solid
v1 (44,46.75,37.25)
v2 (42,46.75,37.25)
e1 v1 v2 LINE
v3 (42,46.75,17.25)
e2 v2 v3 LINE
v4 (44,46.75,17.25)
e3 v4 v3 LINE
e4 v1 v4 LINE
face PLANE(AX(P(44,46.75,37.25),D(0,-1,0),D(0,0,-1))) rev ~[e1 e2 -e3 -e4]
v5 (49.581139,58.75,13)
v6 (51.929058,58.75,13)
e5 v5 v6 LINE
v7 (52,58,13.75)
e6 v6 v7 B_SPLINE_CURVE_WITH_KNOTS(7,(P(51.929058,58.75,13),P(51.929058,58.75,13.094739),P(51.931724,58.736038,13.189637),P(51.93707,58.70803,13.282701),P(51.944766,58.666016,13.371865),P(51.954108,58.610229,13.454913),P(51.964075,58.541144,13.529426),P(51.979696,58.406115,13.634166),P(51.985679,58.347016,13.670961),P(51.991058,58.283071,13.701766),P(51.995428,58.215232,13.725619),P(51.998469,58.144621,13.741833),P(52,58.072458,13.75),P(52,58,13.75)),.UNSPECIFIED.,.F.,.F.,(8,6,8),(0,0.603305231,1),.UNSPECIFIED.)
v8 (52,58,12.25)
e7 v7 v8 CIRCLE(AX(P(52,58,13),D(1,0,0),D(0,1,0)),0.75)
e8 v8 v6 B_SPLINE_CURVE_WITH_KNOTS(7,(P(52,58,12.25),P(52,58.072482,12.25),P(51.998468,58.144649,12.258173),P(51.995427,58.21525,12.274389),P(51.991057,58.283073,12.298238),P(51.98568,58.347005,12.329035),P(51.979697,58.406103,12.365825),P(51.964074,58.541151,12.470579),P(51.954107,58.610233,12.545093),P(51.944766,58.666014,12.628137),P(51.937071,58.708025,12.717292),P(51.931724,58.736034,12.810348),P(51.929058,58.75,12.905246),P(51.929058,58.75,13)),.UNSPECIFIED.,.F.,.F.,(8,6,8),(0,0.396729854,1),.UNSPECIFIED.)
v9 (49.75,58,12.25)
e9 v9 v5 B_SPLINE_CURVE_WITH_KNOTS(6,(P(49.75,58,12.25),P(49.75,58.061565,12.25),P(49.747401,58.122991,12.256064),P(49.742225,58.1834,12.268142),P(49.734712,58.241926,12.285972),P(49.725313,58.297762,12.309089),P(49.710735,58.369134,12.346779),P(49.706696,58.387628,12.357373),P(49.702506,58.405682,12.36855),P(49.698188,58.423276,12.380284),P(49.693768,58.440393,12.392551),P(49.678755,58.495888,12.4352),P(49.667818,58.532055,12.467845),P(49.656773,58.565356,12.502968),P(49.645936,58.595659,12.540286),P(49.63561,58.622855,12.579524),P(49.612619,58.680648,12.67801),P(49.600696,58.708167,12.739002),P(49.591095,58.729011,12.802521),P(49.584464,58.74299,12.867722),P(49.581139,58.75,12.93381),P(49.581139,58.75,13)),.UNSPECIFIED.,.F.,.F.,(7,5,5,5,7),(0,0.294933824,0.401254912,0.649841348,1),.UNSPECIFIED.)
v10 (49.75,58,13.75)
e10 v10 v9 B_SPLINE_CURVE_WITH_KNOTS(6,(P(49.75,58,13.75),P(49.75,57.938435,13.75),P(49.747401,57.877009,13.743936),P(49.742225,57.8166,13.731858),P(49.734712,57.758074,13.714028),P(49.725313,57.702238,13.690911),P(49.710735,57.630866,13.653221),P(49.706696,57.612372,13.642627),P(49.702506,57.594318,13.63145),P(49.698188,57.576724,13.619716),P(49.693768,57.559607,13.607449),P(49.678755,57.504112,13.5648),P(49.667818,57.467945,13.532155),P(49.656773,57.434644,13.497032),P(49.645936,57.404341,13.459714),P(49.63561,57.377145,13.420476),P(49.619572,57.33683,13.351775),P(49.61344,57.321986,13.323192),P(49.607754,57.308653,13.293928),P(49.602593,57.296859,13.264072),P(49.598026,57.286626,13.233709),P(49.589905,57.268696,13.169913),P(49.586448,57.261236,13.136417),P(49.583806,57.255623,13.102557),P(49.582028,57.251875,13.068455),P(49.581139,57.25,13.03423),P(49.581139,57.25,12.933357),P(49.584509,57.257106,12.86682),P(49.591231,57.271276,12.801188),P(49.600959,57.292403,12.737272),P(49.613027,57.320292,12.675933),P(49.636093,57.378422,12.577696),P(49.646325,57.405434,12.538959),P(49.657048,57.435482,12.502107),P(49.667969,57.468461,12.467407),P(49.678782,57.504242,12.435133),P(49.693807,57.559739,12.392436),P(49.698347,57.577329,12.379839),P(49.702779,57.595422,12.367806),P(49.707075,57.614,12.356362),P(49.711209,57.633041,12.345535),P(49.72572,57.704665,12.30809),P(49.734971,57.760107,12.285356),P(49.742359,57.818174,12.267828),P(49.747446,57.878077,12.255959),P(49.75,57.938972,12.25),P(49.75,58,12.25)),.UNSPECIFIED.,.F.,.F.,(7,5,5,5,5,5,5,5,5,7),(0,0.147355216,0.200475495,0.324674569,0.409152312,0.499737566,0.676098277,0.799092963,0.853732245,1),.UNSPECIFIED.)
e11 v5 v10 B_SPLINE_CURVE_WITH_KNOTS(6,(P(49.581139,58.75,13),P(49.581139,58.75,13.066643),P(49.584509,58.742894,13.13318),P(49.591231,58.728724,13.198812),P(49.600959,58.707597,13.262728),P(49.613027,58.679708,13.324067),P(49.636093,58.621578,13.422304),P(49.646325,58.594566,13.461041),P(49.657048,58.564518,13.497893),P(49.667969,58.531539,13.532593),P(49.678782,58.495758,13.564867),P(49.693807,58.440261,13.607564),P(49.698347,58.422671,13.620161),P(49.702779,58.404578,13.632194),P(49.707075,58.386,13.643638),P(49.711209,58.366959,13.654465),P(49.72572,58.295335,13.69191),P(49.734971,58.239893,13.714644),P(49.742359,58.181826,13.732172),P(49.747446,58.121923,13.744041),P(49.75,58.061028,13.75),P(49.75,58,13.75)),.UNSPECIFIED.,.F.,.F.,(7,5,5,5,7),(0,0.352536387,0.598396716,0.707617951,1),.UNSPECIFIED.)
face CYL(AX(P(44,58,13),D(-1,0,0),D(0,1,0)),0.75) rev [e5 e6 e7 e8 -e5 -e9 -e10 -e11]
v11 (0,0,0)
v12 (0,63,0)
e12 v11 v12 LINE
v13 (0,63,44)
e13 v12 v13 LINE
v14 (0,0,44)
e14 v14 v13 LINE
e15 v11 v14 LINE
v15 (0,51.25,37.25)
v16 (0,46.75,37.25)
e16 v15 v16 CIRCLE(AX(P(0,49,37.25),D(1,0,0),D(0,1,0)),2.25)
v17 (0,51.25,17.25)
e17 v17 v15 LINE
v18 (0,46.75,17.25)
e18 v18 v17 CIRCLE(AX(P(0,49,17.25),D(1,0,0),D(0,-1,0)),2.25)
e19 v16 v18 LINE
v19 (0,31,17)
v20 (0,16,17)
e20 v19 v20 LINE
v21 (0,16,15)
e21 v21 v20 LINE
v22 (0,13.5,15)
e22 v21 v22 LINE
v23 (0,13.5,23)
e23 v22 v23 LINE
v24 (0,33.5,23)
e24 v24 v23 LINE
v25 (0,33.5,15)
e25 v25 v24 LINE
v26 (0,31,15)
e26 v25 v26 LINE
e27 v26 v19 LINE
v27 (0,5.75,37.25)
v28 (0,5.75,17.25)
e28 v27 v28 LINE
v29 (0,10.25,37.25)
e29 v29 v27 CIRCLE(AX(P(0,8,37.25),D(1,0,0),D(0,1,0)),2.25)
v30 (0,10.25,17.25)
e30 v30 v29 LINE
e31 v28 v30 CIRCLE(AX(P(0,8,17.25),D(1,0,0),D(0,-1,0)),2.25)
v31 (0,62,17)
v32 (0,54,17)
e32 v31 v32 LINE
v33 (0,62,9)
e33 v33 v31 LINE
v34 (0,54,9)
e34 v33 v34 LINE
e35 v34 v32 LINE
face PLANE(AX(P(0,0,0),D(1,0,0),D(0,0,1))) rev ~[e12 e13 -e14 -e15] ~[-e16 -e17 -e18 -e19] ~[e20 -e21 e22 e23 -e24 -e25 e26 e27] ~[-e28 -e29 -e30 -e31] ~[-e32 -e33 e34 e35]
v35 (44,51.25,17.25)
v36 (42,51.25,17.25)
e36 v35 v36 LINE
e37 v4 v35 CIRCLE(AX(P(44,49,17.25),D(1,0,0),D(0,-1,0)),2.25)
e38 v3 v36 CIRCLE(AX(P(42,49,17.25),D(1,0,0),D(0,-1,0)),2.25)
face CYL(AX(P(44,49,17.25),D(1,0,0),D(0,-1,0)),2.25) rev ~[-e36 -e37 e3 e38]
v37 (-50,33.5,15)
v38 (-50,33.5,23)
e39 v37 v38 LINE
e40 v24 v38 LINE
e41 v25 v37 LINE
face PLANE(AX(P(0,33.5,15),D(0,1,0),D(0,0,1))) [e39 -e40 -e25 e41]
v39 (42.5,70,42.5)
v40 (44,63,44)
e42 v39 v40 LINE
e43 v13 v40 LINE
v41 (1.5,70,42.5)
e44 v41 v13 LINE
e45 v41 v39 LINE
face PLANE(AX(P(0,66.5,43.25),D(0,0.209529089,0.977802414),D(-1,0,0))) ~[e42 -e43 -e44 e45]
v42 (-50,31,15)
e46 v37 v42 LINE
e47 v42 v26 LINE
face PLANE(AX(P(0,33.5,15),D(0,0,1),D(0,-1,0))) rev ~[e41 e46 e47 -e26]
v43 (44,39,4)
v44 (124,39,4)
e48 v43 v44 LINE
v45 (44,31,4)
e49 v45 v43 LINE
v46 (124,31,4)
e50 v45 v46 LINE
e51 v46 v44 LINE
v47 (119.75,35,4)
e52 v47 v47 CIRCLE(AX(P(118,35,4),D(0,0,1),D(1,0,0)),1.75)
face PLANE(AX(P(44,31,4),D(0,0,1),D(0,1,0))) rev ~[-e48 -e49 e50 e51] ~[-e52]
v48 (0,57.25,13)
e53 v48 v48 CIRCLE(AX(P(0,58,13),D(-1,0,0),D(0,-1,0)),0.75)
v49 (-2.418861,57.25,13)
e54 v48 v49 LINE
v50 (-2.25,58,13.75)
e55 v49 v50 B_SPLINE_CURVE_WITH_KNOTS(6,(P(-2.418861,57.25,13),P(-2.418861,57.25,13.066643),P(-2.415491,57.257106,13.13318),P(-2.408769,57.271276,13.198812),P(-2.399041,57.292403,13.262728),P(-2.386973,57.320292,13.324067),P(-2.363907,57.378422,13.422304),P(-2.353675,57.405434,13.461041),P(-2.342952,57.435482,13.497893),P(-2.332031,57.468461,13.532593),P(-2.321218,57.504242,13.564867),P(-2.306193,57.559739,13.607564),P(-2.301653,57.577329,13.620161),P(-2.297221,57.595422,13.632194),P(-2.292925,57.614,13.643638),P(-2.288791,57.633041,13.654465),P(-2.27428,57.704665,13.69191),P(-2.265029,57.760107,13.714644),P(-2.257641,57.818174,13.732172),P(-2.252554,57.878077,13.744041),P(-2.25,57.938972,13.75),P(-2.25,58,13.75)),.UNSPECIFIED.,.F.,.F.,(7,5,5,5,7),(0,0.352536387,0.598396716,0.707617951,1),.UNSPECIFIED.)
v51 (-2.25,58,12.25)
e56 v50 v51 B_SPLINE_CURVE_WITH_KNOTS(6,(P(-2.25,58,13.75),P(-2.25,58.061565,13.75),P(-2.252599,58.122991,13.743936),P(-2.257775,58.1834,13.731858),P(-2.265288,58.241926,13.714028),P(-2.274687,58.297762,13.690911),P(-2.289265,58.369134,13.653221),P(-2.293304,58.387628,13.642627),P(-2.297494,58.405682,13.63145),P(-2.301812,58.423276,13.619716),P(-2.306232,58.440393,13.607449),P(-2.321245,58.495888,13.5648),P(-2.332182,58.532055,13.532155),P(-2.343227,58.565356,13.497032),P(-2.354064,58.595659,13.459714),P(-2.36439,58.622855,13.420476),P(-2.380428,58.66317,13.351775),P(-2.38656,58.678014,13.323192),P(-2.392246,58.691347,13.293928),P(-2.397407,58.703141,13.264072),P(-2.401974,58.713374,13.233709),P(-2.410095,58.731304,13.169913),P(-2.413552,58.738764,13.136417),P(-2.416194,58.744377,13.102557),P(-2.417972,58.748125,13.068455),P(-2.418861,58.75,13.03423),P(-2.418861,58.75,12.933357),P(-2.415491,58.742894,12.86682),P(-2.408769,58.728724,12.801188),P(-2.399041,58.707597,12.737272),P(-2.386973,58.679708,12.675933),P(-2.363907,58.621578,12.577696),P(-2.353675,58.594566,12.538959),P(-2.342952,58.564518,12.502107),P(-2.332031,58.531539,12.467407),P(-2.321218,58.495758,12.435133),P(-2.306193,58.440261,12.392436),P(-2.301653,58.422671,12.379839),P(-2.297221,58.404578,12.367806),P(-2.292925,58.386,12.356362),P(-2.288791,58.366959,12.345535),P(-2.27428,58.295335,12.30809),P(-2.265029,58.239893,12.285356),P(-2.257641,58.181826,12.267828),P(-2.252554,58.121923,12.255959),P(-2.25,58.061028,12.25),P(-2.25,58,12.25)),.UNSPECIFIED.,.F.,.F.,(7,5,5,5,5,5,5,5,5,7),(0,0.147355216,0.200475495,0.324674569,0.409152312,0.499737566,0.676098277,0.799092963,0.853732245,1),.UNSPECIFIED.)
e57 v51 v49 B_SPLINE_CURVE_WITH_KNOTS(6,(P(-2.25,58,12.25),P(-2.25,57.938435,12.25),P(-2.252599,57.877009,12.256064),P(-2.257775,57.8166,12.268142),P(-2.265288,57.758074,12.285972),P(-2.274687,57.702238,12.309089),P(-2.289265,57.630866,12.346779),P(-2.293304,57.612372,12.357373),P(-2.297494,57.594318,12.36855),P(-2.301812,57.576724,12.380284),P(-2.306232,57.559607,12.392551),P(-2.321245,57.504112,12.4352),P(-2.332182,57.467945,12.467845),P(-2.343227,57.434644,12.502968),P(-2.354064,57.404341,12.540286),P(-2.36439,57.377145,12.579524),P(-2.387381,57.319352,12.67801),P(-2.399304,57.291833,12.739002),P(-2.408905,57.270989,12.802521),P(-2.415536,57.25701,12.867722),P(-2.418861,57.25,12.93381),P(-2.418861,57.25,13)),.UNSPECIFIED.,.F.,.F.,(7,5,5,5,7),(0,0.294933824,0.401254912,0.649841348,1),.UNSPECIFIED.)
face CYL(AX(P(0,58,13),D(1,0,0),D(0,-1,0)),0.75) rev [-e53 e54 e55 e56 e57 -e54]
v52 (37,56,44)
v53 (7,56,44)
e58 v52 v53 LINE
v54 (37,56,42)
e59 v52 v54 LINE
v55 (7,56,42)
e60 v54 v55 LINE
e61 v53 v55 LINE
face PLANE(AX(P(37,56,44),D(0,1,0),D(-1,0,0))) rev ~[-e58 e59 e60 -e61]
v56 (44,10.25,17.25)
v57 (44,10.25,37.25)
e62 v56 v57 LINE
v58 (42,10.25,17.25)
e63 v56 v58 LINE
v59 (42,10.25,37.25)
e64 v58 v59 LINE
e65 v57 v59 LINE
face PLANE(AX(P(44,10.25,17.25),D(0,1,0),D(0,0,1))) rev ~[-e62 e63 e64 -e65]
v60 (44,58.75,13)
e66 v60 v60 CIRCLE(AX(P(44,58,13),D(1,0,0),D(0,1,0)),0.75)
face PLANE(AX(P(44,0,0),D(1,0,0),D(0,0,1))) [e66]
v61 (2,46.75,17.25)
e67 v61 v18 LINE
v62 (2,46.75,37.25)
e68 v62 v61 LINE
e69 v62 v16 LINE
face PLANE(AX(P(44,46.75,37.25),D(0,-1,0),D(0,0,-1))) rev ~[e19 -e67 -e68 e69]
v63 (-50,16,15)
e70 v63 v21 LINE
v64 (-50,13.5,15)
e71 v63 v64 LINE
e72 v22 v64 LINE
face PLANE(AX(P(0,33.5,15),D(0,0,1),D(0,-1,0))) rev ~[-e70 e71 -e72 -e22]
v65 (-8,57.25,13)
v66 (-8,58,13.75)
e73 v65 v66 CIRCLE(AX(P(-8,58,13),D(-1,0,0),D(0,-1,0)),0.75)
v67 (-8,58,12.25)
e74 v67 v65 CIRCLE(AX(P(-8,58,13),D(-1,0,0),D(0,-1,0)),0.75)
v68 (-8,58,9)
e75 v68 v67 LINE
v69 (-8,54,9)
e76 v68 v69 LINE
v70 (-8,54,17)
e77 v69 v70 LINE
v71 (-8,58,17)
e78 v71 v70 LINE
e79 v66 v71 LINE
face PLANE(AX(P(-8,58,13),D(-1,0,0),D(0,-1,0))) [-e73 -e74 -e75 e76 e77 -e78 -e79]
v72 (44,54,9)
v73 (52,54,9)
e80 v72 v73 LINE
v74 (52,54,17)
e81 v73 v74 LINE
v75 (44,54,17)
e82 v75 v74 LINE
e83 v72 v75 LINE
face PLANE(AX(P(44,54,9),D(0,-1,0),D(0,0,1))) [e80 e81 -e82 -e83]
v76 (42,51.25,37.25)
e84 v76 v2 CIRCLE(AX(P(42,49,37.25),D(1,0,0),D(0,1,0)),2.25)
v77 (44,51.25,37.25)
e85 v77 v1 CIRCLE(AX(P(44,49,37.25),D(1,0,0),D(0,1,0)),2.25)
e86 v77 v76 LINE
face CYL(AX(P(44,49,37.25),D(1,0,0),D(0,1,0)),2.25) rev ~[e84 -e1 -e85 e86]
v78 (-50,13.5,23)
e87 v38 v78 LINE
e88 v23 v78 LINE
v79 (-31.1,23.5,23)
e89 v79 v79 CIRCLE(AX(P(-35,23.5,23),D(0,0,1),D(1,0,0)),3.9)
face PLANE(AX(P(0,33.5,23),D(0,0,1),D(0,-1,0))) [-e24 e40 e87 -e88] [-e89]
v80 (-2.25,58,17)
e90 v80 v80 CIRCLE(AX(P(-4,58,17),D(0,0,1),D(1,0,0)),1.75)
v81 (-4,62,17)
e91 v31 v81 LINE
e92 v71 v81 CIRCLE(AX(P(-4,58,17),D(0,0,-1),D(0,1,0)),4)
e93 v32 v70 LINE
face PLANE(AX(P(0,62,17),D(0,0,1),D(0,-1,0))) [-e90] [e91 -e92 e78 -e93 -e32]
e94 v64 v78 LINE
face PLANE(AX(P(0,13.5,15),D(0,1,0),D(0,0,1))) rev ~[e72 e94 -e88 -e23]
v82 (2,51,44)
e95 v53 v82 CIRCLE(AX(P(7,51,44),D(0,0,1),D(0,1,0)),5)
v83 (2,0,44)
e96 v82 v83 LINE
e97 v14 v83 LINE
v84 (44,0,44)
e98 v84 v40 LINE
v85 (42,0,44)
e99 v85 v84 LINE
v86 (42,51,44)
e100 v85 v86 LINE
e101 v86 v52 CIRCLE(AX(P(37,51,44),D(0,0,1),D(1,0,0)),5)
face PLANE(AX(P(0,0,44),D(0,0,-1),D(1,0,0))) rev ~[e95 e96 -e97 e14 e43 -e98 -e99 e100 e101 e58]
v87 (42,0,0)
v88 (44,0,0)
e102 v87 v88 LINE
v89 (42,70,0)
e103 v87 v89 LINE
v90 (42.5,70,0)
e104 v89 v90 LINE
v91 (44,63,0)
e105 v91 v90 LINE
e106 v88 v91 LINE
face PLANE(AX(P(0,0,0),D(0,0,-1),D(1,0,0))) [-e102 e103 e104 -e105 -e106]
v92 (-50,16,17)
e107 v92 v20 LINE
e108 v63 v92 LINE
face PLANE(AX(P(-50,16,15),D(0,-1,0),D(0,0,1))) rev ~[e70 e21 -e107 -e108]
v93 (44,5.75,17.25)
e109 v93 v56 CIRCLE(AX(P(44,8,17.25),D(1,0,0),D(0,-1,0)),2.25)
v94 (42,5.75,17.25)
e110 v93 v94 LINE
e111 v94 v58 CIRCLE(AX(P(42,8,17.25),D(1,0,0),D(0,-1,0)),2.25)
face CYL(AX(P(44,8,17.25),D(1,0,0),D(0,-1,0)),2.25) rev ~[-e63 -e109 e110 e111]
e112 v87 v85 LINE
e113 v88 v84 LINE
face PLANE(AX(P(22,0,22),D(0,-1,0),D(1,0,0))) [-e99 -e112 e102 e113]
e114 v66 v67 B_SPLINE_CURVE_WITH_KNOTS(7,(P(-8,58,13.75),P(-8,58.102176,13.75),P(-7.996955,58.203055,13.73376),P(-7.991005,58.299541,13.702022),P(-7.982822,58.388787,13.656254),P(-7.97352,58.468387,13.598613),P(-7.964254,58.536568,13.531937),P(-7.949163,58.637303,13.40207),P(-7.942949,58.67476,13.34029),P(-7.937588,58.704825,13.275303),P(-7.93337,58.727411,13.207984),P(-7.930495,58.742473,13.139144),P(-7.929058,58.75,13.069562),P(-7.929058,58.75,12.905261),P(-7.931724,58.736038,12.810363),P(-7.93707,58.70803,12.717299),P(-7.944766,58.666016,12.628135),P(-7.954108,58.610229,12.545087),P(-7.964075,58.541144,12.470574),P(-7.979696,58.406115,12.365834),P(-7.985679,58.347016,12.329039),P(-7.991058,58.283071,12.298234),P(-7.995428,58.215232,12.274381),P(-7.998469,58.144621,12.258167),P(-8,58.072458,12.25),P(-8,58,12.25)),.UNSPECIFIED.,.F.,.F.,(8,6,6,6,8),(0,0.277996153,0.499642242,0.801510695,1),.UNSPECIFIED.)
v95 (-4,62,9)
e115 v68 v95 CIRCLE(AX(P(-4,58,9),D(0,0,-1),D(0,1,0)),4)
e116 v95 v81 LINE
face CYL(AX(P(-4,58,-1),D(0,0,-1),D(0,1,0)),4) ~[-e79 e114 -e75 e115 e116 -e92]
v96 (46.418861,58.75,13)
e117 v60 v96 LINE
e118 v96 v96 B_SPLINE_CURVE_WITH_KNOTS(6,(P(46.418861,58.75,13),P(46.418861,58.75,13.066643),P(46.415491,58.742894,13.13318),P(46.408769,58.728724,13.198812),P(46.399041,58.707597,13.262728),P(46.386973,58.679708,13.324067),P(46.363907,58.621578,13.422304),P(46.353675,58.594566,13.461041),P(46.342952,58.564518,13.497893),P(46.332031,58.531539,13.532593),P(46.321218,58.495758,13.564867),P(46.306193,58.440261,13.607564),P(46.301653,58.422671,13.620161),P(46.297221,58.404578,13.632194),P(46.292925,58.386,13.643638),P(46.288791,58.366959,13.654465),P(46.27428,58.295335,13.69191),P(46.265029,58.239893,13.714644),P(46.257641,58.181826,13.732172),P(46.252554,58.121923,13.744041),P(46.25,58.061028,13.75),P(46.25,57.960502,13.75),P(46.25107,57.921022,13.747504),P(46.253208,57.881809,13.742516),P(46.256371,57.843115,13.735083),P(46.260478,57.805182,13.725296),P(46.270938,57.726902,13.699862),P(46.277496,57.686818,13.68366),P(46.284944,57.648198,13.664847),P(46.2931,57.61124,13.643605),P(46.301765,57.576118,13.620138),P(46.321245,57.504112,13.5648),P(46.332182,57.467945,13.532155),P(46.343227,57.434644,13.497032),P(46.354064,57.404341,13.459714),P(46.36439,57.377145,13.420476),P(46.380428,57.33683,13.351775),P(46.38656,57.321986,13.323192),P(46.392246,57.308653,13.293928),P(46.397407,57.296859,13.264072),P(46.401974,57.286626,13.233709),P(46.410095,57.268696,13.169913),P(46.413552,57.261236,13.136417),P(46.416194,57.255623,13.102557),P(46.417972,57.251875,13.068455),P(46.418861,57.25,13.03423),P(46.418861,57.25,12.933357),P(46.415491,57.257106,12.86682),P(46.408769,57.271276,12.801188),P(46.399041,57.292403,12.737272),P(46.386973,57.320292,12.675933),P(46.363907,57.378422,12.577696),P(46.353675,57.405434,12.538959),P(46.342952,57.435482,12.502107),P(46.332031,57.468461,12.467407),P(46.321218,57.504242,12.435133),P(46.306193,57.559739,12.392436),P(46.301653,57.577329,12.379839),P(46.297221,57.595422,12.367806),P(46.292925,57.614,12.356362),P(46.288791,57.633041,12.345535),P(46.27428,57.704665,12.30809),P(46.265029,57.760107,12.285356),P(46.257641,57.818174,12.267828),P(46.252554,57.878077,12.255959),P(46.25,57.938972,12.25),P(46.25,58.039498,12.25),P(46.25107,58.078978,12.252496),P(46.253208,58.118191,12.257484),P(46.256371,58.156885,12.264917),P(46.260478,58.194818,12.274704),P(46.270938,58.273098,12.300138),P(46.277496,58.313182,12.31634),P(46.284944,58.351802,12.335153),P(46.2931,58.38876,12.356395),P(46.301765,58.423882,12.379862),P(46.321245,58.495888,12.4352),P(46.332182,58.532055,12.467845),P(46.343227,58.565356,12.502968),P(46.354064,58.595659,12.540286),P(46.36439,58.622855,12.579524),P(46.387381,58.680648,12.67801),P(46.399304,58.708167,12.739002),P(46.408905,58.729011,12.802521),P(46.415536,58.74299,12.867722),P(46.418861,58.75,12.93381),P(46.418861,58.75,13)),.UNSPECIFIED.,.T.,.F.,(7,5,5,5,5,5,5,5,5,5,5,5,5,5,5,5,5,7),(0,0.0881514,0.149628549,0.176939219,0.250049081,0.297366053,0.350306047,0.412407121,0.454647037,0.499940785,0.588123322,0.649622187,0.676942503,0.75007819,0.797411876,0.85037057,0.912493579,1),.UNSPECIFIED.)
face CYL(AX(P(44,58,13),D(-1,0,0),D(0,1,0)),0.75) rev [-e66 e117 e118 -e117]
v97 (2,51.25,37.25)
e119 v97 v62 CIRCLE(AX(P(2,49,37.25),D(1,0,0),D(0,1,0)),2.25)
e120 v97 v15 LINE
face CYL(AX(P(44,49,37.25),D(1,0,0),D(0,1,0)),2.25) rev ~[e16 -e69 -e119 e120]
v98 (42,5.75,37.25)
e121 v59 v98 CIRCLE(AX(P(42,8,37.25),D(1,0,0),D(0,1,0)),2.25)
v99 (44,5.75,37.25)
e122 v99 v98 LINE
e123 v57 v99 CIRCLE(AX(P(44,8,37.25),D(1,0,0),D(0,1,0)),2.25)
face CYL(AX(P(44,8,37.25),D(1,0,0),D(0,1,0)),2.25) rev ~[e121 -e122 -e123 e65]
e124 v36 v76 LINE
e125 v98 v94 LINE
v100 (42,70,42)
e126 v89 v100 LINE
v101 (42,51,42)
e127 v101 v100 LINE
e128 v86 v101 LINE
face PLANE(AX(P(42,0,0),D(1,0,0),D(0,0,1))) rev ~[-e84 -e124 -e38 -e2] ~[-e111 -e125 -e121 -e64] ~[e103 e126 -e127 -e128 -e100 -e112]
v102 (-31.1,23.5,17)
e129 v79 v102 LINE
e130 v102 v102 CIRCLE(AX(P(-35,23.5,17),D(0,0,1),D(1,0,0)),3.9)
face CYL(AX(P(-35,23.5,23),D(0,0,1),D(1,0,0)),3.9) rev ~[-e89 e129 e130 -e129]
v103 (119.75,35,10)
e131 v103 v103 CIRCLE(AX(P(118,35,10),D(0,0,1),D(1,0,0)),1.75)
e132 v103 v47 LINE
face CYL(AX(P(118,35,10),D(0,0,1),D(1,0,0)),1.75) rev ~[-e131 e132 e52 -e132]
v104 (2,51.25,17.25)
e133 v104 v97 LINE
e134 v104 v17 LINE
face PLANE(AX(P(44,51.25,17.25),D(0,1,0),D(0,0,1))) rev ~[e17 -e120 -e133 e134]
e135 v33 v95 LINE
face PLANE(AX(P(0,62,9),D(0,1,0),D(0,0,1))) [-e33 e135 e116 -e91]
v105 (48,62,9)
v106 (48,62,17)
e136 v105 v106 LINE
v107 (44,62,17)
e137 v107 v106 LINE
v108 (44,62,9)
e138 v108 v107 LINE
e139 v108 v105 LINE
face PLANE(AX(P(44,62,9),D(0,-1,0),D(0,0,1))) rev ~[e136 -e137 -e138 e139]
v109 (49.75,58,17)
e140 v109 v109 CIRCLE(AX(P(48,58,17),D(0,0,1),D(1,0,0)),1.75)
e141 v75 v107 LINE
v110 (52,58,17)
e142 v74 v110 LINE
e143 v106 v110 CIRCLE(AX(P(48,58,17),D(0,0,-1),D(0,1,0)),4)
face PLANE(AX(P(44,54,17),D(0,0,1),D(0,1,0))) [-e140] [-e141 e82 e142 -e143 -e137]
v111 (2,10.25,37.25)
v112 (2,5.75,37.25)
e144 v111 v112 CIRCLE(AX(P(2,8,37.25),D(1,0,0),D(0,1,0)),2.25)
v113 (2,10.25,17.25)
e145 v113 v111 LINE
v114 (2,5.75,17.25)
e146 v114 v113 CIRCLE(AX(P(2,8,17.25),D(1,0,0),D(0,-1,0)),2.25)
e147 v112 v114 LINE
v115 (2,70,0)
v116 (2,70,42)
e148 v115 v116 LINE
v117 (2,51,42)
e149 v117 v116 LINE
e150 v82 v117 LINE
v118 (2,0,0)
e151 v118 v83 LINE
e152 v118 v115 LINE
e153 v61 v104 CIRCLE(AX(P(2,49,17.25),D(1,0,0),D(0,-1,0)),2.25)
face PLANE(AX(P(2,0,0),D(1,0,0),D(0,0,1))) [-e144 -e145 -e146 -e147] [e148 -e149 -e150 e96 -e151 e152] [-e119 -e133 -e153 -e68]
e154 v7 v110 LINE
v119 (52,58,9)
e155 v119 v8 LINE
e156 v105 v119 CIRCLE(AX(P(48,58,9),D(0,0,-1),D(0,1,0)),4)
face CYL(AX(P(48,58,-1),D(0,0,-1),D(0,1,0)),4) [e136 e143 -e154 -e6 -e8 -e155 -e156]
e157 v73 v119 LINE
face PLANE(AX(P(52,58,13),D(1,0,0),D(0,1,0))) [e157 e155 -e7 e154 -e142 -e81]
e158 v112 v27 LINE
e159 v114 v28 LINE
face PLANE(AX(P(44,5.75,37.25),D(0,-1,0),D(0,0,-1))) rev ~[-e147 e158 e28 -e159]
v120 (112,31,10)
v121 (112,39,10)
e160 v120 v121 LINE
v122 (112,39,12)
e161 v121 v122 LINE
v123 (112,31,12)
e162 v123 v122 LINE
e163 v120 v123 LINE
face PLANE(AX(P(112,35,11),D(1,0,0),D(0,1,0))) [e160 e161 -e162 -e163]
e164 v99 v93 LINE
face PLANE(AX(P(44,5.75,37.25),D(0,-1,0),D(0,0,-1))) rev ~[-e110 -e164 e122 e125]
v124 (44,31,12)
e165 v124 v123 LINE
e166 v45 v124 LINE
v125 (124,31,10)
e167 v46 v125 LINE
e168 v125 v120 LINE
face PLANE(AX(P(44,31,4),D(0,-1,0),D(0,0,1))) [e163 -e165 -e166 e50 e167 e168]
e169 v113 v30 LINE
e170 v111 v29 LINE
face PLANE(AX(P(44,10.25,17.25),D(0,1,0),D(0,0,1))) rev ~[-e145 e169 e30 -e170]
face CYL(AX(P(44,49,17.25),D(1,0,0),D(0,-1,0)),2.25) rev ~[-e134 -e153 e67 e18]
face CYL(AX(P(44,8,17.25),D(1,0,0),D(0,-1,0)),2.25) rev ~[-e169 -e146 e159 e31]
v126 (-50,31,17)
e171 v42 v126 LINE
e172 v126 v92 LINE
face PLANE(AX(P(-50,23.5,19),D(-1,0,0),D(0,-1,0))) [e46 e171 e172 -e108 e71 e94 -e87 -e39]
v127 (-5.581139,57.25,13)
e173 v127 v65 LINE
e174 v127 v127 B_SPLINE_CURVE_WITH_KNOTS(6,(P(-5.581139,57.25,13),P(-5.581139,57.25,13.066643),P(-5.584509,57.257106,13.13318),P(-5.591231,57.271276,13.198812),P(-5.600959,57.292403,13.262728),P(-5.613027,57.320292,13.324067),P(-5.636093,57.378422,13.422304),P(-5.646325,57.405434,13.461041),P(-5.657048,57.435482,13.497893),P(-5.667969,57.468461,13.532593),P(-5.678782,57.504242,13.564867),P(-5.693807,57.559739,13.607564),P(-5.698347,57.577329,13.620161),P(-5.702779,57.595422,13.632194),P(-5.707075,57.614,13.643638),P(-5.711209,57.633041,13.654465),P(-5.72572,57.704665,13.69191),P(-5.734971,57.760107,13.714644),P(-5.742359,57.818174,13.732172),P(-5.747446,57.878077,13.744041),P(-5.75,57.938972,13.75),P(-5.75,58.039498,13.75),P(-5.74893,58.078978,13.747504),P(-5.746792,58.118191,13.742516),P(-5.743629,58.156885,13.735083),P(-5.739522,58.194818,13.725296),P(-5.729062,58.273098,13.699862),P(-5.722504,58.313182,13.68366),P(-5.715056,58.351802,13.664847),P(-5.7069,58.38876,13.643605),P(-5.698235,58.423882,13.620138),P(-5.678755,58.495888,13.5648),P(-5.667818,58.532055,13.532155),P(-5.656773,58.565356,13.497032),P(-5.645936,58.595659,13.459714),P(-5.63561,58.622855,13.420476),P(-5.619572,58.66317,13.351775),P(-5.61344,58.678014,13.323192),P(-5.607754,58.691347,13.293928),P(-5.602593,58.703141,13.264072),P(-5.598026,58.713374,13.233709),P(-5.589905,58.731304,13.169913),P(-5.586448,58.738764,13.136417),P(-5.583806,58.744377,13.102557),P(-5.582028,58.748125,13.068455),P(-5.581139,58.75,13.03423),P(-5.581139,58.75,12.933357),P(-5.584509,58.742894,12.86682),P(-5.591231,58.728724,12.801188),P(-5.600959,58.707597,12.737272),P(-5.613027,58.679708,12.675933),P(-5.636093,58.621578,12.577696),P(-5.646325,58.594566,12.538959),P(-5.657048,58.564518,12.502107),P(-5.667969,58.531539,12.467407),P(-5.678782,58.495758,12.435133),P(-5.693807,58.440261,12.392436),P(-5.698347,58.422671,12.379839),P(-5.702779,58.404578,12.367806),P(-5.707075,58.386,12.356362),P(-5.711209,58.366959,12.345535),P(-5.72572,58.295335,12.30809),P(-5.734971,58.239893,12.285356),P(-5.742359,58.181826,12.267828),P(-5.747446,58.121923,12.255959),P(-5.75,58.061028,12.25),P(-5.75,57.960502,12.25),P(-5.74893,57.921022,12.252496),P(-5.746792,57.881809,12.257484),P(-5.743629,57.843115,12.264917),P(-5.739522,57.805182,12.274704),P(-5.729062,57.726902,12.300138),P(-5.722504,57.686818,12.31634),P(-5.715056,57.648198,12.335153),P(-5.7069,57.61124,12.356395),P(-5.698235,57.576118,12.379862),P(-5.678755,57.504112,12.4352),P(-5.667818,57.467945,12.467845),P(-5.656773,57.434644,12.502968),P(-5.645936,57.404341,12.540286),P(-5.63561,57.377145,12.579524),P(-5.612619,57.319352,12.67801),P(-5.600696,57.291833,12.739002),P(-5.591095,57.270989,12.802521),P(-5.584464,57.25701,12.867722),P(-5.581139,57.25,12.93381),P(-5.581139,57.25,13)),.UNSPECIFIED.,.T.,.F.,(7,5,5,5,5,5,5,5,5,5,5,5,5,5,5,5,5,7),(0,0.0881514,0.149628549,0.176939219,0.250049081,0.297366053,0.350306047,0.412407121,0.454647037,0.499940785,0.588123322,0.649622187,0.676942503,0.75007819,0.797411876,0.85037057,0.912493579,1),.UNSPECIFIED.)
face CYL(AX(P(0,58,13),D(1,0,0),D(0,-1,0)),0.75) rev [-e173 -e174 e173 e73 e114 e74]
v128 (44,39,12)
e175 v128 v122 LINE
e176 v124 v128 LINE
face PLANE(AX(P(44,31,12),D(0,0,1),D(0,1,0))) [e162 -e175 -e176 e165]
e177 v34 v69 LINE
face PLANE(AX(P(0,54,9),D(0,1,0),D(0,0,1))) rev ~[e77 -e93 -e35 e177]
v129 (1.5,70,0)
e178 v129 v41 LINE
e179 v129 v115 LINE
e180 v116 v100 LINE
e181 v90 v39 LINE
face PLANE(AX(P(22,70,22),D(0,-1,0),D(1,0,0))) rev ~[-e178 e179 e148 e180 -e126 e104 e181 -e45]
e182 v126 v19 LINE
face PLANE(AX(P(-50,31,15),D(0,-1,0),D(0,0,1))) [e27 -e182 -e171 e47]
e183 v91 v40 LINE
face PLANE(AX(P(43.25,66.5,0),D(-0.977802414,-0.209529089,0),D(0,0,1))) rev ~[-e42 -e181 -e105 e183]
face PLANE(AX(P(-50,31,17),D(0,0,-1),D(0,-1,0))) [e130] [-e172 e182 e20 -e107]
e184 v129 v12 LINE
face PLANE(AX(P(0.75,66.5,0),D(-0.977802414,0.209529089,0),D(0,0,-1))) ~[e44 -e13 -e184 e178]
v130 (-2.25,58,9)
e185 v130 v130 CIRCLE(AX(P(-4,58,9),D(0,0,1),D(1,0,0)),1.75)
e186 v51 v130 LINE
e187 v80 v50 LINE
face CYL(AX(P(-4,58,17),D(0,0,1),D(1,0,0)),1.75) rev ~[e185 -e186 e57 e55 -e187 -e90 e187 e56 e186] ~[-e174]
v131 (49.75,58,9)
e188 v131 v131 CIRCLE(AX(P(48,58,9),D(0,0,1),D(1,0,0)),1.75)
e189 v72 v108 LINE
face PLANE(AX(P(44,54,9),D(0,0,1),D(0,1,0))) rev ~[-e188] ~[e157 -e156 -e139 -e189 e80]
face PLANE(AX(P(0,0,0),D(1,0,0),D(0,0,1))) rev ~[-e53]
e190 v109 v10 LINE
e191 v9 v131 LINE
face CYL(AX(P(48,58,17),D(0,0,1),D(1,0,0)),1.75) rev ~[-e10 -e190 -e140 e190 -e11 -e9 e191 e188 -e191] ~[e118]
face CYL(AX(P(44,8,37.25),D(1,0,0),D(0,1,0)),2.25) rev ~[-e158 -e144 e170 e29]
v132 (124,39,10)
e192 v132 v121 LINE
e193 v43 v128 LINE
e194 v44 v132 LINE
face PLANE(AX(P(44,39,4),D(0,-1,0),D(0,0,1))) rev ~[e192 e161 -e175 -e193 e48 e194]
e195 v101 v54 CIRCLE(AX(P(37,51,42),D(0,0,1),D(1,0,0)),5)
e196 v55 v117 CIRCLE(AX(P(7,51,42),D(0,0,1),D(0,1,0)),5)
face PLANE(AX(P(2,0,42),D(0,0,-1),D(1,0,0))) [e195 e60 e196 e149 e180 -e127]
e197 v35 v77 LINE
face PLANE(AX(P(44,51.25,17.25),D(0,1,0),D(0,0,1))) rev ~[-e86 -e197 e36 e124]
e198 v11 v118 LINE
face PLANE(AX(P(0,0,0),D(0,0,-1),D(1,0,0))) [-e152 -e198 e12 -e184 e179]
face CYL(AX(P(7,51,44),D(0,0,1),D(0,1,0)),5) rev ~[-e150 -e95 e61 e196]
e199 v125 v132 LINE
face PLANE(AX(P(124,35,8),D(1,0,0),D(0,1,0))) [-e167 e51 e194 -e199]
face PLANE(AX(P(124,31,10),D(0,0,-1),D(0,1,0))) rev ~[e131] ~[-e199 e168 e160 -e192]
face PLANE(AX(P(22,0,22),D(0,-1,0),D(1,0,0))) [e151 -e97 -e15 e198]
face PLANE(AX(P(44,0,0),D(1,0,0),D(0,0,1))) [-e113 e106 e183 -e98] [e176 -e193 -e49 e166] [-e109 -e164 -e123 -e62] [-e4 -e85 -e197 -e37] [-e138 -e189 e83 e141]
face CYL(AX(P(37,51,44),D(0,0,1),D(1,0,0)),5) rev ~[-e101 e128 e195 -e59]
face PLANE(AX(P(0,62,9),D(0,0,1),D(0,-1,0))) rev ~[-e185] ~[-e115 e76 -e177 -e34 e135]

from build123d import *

# Parameters (mm, degrees)
F0_W         = 44
F0_H         = 44
F1_DEPTH     = 70
F2_W         = 40
F2_H         = 42
F3_DEPTH     = 70
F5_DEPTH     = 44
F7_DEPTH     = 2
F9_W         = 8
F9_H         = 8
F10_DEPTH    = 80
F11_W        = 8
F11_H        = 2
F12_DEPTH    = 12
F13_W        = 20
F13_H        = 8
F14_DEPTH    = 50
F15_W        = 15
F15_H        = 2
F16_DEPTH    = 50
F17_R        = 3.9
F18_DEPTH    = 20
F19_SIZE2    = 1.5
F19_SIZE     = 7
F20_SIZE2    = 7
F20_SIZE     = 1.5
F21_SIZE2    = 7
F21_SIZE     = 1.5
F22_R        = 1.75
F23_DEPTH    = 8
F24_DEPTH    = 44
F25_W        = 8
F25_H        = 8
F25_R        = 0.75
F26_DEPTH    = 8
F27_R        = 1.75
F28_DEPTH    = 8
F29_T1_DEPTH = 28
F30_W        = 8
F30_H        = 8
F30_R        = 0.75
F31_DEPTH    = 8
F32_R        = 1.75
F33_DEPTH    = 8
F34_T1_DEPTH = 28


# Not quite as in the source:
# - a fillet or chamfer that OpenCascade refuses, or shapes differently, is made with other operations: its cross-section is extruded or revolved along the edge and cut away or added


with BuildPart() as f1:
    # F0 (on Front) → F1 (new body)
    with BuildSketch(Plane.XZ):
        with Locations((22, 22)):
            Rectangle(F0_W, F0_H)
    extrude(amount=-F1_DEPTH)

    # F2 (on face) → F3 (cut, through all)
    with BuildSketch(Plane.XZ):
        with Locations((22, 21)):
            Rectangle(F2_W, F2_H)
    extrude(amount=-F3_DEPTH, mode=Mode.SUBTRACT)

    # F4 (on face) → F5 (cut)
    with BuildSketch(Plane.YZ.offset(44)):
        with BuildLine():
            ThreePointArc((51.25, 37.25), (49, 39.5), (46.75, 37.25))
            Line((46.75, 37.25), (46.75, 17.25))
            ThreePointArc((46.75, 17.25), (49, 15), (51.25, 17.25))
            Line((51.25, 17.25), (51.25, 37.25))
        make_face()
    extrude(amount=-F5_DEPTH, mode=Mode.SUBTRACT)

    # F6 (on face) → F7 (cut, through all)
    with BuildSketch(Plane.XY.offset(44)):
        with BuildLine():
            Line((2, 51), (2, 0))
            Line((2, 0), (42, 0))
            Line((42, 0), (42, 51))
            ThreePointArc((42, 51), (40.5355339059, 54.5355339059), (37, 56))
            Line((37, 56), (7, 56))
            ThreePointArc((7, 56), (3.4644660941, 54.5355339059), (2, 51))
        make_face()
    extrude(amount=-F7_DEPTH, mode=Mode.SUBTRACT)

    # F9 (on face) → F10 (join)
    with BuildSketch(Plane.YZ.offset(44)):
        with Locations((35, 8)):
            Rectangle(F9_W, F9_H)
    extrude(amount=F10_DEPTH)

    # F11 (on face) → F12 (cut)
    with BuildSketch(Plane.YZ.offset(124)):
        with Locations((35, 11)):
            Rectangle(F11_W, F11_H)
    extrude(amount=-F12_DEPTH, mode=Mode.SUBTRACT)

    # F13 (on face) → F14 (join)
    with BuildSketch(Plane(origin=(0, 0, 0), x_dir=(0, -1, 0), z_dir=(-1, 0, 0))):
        with Locations((-23.5, 19)):
            Rectangle(F13_W, F13_H)
    extrude(amount=F14_DEPTH)

    # F15 (on face) → F16 (cut, through all)
    with BuildSketch(Plane(origin=(-50, 0, 0), x_dir=(0, -1, 0), z_dir=(-1, 0, 0))):
        with Locations((-23.5, 16)):
            Rectangle(F15_W, F15_H)
    extrude(amount=-F16_DEPTH, mode=Mode.SUBTRACT)

    # F17 (on face) → F18 (cut)
    with BuildSketch(Plane.XY.offset(23)):
        with Locations((-35, 23.5)):
            Circle(F17_R)
    extrude(amount=-F18_DEPTH, mode=Mode.SUBTRACT)

    # F19
    f19_edges = [f1.edges().sort_by_distance(p)[0] for p in [
        (44, 70, 22),
    ]]
    f19_side = f1.faces().sort_by_distance((44, 34.490511, 22.116835))[0]
    chamfer(f19_edges, length=F19_SIZE, length2=F19_SIZE2, reference=f19_side)

    # F20
    f20_edges = [f1.edges().sort_by_distance(p)[0] for p in [
        (21.25, 70, 44),
    ]]
    f20_side = f1.faces().sort_by_distance((21.25, 70, 43.388261))[0]
    chamfer(f20_edges, length=F20_SIZE, length2=F20_SIZE2, reference=f20_side)

    # F21
    f21_edges = [f1.edges().sort_by_distance(p)[0] for p in [
        (0, 70, 21.25),
    ]]
    f21_side = f1.faces().sort_by_distance((42.439896, 70, 21.25))[0]
    chamfer(f21_edges, length=F21_SIZE, length2=F21_SIZE2, reference=f21_side)

    # F22 (on face) → F23 (cut)
    with BuildSketch(Plane.XY.offset(10)):
        with Locations((118, 35)):
            Circle(F22_R)
    extrude(amount=-F23_DEPTH, mode=Mode.SUBTRACT)

    # F8 (on face) → F24 (cut)
    with BuildSketch(Plane.YZ.offset(44)):
        with BuildLine():
            ThreePointArc((10.25, 37.25), (8, 39.5), (5.75, 37.25))
            Line((5.75, 37.25), (5.75, 17.25))
            ThreePointArc((5.75, 17.25), (8, 15), (10.25, 17.25))
            Line((10.25, 17.25), (10.25, 37.25))
        make_face()
    extrude(amount=-F24_DEPTH, mode=Mode.SUBTRACT)

    # F25 (on face) → F26 (join)
    with BuildSketch(Plane.YZ.offset(44)):
        with Locations((58, 13)):
            Rectangle(F25_W, F25_H)
        with Locations((58, 13)):
            Circle(F25_R, mode=Mode.SUBTRACT)
    extrude(amount=F26_DEPTH)

    # F27 (on face) → F28 (cut)
    with BuildSketch(Plane.XY.offset(17)):
        with Locations((48, 58)):
            Circle(F27_R)
    extrude(amount=-F28_DEPTH, mode=Mode.SUBTRACT)

    # F29: fillet of radius 4 on 1 edges, made by hand

    # F29_s2 → F29_t1 (cut)
    with BuildSketch(Plane.XY.offset(-1)):
        with BuildLine():
            ThreePointArc((48, 62), (50.8284271247, 60.8284271247), (52, 58))
            Line((52, 58), (52, 62))
            Line((52, 62), (48, 62))
        make_face()
    extrude(amount=F29_T1_DEPTH, mode=Mode.SUBTRACT)

    # F30 (on face) → F31 (join)
    with BuildSketch(Plane(origin=(0, 0, 0), x_dir=(0, -1, 0), z_dir=(-1, 0, 0))):
        with Locations((-58, 13)):
            Rectangle(F30_W, F30_H)
        with Locations((-58, 13)):
            Circle(F30_R, mode=Mode.SUBTRACT)
    extrude(amount=F31_DEPTH)

    # F32 (on face) → F33 (cut)
    with BuildSketch(Plane.XY.offset(17)):
        with Locations((-4, 58)):
            Circle(F32_R)
    extrude(amount=-F33_DEPTH, mode=Mode.SUBTRACT)

    # F34: fillet of radius 4 on 1 edges, made by hand

    # F34_s2 → F34_t1 (cut)
    with BuildSketch(Plane.XY.offset(-1)):
        with BuildLine():
            ThreePointArc((-4, 62), (-6.8284271247, 60.8284271247), (-8, 58))
            Line((-8, 58), (-8, 62))
            Line((-8, 62), (-4, 62))
        make_face()
    extrude(amount=F34_T1_DEPTH, mode=Mode.SUBTRACT)


solid = f1.part
